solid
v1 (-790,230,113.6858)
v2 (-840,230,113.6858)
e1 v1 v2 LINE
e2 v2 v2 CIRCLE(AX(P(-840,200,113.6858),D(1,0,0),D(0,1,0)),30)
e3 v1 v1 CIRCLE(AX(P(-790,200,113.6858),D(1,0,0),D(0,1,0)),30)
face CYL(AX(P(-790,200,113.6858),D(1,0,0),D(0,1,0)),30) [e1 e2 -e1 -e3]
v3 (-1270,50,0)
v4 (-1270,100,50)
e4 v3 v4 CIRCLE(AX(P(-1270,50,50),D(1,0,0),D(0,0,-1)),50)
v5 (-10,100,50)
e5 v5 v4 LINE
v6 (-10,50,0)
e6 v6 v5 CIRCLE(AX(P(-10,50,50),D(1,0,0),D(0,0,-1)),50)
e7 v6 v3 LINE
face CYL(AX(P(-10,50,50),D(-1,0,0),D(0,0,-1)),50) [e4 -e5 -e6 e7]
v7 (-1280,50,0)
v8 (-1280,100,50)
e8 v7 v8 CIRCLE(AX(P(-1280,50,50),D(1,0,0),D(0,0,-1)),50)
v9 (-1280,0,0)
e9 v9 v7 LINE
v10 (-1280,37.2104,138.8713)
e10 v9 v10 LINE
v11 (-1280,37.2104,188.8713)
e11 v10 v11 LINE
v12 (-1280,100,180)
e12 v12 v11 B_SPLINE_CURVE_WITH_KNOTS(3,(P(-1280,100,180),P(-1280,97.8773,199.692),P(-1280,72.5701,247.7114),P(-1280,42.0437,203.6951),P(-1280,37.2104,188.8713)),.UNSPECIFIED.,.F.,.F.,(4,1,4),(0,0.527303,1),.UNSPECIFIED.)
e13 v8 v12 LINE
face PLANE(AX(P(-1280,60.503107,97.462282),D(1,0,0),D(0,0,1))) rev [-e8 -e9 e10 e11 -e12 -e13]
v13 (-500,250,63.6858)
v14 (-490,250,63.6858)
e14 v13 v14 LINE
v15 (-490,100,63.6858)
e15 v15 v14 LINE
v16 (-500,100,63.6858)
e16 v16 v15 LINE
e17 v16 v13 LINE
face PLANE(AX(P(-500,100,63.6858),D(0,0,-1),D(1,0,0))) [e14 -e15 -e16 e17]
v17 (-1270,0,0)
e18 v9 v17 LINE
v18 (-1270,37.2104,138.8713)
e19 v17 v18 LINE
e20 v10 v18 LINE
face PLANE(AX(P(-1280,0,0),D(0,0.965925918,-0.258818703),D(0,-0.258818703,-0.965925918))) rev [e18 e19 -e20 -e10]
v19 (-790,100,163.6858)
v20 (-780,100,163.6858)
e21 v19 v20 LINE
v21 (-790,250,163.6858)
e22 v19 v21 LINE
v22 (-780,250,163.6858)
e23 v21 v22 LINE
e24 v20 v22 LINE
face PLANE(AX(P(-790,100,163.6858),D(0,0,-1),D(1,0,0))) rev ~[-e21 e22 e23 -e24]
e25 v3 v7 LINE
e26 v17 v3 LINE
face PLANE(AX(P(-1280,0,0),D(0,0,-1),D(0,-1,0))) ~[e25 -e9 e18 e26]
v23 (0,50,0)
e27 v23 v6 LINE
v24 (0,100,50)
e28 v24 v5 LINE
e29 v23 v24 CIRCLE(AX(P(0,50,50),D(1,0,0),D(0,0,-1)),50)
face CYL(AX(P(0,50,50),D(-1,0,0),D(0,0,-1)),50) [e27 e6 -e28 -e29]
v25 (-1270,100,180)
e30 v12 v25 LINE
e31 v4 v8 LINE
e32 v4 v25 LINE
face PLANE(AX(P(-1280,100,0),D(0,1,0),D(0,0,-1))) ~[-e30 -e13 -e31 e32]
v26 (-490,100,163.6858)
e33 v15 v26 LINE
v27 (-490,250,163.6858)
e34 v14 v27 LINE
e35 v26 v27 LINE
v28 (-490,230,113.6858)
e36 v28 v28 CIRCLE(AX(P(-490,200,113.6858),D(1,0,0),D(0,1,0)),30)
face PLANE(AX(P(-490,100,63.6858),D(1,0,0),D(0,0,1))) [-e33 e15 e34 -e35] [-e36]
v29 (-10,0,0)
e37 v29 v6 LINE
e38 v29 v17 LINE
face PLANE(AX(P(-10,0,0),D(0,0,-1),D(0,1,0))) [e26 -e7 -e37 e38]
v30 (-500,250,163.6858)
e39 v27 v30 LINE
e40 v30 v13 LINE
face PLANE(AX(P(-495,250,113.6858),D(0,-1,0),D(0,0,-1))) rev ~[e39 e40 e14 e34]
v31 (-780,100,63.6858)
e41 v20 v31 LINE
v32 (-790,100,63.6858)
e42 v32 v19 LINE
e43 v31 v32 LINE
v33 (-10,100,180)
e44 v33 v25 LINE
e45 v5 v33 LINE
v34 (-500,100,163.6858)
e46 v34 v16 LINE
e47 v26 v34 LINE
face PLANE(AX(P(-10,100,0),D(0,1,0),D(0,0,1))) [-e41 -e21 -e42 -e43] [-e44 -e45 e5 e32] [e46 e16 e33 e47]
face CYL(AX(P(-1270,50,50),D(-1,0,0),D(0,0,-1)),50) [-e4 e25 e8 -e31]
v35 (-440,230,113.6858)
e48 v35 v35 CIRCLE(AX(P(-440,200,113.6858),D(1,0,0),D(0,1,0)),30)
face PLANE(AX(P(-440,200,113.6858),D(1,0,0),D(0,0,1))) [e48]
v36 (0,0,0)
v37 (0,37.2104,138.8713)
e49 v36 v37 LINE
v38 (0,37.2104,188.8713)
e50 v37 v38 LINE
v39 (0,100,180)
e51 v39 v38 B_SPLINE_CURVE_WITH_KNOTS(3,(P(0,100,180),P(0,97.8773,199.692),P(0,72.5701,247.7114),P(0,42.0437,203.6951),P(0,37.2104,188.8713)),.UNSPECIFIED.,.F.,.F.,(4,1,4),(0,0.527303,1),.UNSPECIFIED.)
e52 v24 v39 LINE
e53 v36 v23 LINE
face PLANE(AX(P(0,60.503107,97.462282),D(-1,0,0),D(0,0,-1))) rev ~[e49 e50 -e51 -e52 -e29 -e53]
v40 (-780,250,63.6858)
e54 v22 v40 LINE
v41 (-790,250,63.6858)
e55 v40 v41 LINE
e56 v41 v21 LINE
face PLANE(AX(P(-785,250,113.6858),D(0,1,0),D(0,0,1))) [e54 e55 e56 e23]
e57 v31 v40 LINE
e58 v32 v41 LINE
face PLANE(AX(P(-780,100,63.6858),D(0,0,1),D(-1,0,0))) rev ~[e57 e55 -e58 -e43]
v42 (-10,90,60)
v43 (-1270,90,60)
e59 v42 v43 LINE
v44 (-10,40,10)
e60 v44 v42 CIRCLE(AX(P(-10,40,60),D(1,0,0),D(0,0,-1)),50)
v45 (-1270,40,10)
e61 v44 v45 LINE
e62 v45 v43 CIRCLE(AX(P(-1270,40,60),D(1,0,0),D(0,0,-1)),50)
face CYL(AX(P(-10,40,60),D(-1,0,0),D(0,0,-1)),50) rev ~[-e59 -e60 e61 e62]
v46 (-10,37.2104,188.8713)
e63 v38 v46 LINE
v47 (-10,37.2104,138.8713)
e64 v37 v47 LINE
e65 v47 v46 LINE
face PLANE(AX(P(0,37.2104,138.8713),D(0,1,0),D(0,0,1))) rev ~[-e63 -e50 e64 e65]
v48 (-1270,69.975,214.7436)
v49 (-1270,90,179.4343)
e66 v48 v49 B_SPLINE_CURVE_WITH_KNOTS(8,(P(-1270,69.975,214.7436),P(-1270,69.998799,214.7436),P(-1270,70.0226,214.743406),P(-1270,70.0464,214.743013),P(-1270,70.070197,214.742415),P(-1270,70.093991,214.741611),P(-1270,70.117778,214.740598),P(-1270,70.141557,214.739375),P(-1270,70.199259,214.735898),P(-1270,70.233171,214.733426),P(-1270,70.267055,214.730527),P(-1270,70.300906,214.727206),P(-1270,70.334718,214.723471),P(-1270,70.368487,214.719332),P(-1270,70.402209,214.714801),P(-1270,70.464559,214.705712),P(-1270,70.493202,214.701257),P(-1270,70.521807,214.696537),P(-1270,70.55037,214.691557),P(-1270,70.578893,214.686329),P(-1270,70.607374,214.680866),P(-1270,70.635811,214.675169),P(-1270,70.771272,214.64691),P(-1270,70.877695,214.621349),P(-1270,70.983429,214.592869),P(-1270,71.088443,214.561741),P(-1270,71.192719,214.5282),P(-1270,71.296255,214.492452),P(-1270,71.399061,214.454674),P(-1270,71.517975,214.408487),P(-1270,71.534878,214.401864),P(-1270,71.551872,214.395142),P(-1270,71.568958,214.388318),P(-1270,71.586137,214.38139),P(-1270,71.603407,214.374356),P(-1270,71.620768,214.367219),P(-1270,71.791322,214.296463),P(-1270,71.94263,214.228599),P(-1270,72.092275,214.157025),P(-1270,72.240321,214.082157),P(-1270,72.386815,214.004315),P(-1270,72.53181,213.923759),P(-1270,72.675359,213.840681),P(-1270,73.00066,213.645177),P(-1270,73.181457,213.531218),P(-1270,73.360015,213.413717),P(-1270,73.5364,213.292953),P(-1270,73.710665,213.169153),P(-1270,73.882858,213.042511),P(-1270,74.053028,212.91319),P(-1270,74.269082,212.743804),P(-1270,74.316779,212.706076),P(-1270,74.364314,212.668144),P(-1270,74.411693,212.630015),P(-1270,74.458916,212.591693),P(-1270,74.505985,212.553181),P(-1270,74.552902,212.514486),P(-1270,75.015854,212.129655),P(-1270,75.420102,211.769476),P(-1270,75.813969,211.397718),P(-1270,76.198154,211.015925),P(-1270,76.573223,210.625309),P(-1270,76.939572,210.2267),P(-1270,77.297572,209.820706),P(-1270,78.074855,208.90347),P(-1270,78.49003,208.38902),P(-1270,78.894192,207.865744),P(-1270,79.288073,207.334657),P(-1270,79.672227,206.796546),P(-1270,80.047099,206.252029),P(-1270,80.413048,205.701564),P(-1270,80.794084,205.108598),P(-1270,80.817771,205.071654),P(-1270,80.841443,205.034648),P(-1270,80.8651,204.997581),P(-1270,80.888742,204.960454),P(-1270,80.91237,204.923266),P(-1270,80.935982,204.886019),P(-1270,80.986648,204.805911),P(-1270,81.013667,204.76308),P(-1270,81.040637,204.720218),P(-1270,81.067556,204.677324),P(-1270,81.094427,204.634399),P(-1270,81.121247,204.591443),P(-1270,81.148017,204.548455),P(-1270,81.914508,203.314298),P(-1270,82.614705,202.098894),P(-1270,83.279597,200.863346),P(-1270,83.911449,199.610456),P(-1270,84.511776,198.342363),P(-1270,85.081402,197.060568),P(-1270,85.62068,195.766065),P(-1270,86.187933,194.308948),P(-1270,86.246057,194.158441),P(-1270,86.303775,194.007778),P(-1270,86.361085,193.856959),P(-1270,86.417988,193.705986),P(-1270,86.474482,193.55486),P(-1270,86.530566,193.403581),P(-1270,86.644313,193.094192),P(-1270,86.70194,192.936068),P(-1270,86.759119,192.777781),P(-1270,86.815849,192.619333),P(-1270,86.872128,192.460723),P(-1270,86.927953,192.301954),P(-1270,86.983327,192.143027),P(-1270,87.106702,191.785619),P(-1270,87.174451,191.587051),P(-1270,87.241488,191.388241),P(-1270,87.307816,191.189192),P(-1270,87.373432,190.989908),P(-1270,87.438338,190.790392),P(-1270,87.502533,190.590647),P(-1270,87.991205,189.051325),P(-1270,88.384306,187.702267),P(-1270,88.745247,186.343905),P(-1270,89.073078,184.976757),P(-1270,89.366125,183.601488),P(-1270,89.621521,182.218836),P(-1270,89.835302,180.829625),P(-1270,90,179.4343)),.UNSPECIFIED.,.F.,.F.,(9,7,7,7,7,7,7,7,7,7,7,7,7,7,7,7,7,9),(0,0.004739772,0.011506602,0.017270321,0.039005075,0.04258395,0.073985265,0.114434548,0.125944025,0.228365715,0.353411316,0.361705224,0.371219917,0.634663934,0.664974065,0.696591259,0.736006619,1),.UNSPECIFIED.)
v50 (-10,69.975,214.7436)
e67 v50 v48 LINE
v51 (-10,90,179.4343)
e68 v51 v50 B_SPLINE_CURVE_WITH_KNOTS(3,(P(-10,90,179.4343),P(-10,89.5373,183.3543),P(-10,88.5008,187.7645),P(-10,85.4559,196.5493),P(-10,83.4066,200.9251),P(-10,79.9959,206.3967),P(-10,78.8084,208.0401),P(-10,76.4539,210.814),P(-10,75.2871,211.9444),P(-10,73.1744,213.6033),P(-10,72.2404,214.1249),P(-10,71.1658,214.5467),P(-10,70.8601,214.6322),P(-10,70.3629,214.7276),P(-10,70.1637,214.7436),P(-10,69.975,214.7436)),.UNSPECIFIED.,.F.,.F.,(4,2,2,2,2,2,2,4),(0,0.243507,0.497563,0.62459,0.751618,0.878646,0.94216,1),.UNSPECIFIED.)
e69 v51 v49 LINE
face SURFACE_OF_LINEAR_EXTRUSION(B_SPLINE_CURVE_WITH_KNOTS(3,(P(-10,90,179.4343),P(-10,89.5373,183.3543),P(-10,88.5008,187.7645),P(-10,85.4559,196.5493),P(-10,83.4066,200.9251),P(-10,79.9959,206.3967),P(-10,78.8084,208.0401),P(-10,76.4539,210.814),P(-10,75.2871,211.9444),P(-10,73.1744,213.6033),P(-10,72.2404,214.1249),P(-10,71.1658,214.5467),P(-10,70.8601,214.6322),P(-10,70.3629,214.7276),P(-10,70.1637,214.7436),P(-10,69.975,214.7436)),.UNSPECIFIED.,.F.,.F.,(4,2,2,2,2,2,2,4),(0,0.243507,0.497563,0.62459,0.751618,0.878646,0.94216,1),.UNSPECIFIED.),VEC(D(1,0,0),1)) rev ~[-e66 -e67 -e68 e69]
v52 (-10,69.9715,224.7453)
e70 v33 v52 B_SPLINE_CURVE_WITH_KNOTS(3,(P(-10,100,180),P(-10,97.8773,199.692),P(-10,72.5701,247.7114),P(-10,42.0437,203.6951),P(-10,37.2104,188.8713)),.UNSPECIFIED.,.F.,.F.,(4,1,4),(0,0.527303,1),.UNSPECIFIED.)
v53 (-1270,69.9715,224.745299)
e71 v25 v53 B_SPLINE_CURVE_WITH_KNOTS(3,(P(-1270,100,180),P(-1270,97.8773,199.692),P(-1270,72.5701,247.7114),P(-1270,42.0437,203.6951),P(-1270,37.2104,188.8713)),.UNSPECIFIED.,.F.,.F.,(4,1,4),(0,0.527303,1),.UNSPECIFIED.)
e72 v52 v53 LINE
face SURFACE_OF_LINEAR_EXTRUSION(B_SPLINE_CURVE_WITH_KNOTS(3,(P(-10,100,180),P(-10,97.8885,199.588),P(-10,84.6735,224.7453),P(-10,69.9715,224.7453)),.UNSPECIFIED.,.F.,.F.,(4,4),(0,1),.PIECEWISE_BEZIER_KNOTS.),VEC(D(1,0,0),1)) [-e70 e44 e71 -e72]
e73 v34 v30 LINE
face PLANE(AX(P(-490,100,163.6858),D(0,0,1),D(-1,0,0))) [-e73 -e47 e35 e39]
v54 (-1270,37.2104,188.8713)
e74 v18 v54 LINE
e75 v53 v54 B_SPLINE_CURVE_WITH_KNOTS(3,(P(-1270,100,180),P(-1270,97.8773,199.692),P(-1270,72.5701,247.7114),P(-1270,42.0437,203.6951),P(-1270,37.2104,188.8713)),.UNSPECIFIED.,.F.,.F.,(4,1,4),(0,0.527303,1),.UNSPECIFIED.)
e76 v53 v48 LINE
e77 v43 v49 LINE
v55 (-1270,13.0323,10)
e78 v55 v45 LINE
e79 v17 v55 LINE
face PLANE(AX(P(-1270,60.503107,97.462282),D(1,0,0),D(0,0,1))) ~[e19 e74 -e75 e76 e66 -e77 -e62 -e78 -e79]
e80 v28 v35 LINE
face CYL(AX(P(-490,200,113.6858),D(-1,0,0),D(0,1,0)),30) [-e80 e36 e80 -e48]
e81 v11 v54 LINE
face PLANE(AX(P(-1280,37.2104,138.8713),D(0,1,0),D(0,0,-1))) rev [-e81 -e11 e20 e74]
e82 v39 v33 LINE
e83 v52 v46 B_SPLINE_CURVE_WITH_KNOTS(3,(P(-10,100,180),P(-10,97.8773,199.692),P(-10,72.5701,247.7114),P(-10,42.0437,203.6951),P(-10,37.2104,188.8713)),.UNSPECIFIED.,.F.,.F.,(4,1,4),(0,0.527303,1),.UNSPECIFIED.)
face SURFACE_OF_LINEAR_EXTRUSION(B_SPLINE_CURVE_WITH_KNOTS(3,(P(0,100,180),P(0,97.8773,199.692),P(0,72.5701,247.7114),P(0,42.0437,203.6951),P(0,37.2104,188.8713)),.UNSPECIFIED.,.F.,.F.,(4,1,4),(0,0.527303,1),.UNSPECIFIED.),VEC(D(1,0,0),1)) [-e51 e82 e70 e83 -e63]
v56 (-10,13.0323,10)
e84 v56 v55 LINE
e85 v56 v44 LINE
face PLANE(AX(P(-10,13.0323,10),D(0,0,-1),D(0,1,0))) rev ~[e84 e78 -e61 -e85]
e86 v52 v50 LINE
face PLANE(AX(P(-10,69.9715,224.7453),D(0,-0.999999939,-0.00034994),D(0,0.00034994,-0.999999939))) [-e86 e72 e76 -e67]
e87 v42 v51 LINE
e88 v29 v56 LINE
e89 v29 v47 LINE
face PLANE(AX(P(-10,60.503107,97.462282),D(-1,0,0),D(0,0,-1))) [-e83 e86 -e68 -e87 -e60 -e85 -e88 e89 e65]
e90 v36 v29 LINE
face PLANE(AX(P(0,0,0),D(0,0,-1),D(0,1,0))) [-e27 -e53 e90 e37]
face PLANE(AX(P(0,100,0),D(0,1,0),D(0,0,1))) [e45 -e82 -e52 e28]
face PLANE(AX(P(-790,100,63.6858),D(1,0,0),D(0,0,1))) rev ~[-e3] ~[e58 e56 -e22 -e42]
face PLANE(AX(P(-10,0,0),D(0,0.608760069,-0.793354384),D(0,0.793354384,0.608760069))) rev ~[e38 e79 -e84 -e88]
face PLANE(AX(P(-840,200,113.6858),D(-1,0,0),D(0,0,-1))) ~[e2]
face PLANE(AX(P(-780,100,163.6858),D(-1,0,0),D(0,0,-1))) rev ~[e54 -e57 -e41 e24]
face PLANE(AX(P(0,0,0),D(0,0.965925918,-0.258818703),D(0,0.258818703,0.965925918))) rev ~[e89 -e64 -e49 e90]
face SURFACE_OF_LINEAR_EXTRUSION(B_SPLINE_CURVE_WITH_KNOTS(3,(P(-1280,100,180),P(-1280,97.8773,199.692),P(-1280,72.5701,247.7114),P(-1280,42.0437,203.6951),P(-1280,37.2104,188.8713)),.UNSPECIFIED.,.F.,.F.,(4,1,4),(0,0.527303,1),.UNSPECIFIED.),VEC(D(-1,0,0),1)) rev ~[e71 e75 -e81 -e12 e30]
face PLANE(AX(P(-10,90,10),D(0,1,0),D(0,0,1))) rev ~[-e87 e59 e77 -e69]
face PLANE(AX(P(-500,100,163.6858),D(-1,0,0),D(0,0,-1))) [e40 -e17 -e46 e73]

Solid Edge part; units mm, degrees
sketch "Sketch1" plane through (0, 0, 0) normal (1, 0, 0) x (0, 1, 0)
  line L0 (37.2104, 138.8713) -> (37.2104, 188.8713)
  spline S0 degree 3 poles (100, 180) (97.8773, 199.692) (72.5701, 247.7114) (42.0437, 203.6951) (37.2104, 188.8713) knots 0 0 0 0 0.527303 1 1 1 1
  line L1 (100, 0) -> (100, 180)
  line L2 (0, 0) -> (100, 0)
  line L3 (0, 0) -> (37.2104, 138.8713)
extrude "Protrusion1" add sketch "Sketch1" against normal blind 10
mirror "Mirror1" about plane through (-640, 0, 0) normal (1, 0, 0) of "Protrusion1"
sketch "Sketch2" plane through (-10, 50, 112.439) normal (-1, 0, 0) x (0, -1, 0)
  line L0 (-50, -112.439) -> (-50, 67.561)
  spline S0 degree 3 poles (-50, 67.561) (-47.8885, 87.149) (-34.6735, 112.3063) (-19.9715, 112.3063) knots 0 0 0 0 1 1 1 1
  line L1 (-19.9715, 112.3063) -> (-19.975, 102.3046)
  spline S1 degree 3 poles (-40, 66.9953) (-39.5373, 70.9153) (-38.5008, 75.3255) (-35.4559, 84.1103) (-33.4066, 88.4861) (-29.9959, 93.9577) (-28.8084, 95.6011) (-26.4539, 98.375) (-25.2871, 99.5054) (-23.1744, 101.1643) (-22.2404, 101.6859) (-21.1658, 102.1077) (-20.8601, 102.1932) (-20.3629, 102.2886) (-20.1637, 102.3046) (-19.975, 102.3046) knots 0 0 0 0 0.243507 0.243507 0.497563 0.497563 0.62459 0.62459 0.751618 0.751618 0.878646 0.878646 0.94216 0.94216 1 1 1 1
  line L2 (-40, -102.439) -> (-40, 66.9953)
  line L3 (36.9677, -102.439) -> (-40, -102.439)
  line L4 (50, -112.439) -> (36.9677, -102.439)
  line L5 (50, -112.439) -> (-50, -112.439)
  dimension "D1" = 10
extrude "Protrusion3" add sketch "Sketch2" along normal up to next
fillet "Round_1" radius 50 1 edges at (-640, 90, 10)
fillet "Round_2" radius 50 1 edges at (-640, 100, 0)
sketch "Sketch3" plane through (-540, 100, 115) normal (0, 1, 0) x (-1, 0, 0)
  line L0 (-50, 48.6858) -> (-40, 48.6858)
  line L1 (-40, 48.6858) -> (-40, -51.3142)
  line L2 (-40, -51.3142) -> (-50, -51.3142)
  line L3 (-50, -51.3142) -> (-50, 48.6858)
  line L4 (250, 48.6858) -> (240, 48.6858)
  line L5 (240, 48.6858) -> (240, -51.3142)
  line L6 (240, -51.3142) -> (250, -51.3142)
  line L7 (250, -51.3142) -> (250, 48.6858)
  dimension "D1" = 300
  dimension "D2" = 100
  dimension "D3" = 10
  dimension "D4" = 10
extrude "Protrusion4" add sketch "Sketch3" along normal blind 150
extrude "Cutout1" [suppressed]
sketch "Sketch4" plane through (-490, 175, 113.6858) normal (1, 0, 0) x (0, 1, 0)
  circle A0 centre (25, 0) radius 30
  dimension "D1" = 60
  dimension "D2" = 50
  dimension "D3" = 50
extrude "ExtrudedProtrusion_5" add sketch "Sketch4" along normal blind 50
mirror "Mirror2" about plane through (-640, 175, 113.6858) normal (-1, 0, 0) of "ExtrudedProtrusion_5"
